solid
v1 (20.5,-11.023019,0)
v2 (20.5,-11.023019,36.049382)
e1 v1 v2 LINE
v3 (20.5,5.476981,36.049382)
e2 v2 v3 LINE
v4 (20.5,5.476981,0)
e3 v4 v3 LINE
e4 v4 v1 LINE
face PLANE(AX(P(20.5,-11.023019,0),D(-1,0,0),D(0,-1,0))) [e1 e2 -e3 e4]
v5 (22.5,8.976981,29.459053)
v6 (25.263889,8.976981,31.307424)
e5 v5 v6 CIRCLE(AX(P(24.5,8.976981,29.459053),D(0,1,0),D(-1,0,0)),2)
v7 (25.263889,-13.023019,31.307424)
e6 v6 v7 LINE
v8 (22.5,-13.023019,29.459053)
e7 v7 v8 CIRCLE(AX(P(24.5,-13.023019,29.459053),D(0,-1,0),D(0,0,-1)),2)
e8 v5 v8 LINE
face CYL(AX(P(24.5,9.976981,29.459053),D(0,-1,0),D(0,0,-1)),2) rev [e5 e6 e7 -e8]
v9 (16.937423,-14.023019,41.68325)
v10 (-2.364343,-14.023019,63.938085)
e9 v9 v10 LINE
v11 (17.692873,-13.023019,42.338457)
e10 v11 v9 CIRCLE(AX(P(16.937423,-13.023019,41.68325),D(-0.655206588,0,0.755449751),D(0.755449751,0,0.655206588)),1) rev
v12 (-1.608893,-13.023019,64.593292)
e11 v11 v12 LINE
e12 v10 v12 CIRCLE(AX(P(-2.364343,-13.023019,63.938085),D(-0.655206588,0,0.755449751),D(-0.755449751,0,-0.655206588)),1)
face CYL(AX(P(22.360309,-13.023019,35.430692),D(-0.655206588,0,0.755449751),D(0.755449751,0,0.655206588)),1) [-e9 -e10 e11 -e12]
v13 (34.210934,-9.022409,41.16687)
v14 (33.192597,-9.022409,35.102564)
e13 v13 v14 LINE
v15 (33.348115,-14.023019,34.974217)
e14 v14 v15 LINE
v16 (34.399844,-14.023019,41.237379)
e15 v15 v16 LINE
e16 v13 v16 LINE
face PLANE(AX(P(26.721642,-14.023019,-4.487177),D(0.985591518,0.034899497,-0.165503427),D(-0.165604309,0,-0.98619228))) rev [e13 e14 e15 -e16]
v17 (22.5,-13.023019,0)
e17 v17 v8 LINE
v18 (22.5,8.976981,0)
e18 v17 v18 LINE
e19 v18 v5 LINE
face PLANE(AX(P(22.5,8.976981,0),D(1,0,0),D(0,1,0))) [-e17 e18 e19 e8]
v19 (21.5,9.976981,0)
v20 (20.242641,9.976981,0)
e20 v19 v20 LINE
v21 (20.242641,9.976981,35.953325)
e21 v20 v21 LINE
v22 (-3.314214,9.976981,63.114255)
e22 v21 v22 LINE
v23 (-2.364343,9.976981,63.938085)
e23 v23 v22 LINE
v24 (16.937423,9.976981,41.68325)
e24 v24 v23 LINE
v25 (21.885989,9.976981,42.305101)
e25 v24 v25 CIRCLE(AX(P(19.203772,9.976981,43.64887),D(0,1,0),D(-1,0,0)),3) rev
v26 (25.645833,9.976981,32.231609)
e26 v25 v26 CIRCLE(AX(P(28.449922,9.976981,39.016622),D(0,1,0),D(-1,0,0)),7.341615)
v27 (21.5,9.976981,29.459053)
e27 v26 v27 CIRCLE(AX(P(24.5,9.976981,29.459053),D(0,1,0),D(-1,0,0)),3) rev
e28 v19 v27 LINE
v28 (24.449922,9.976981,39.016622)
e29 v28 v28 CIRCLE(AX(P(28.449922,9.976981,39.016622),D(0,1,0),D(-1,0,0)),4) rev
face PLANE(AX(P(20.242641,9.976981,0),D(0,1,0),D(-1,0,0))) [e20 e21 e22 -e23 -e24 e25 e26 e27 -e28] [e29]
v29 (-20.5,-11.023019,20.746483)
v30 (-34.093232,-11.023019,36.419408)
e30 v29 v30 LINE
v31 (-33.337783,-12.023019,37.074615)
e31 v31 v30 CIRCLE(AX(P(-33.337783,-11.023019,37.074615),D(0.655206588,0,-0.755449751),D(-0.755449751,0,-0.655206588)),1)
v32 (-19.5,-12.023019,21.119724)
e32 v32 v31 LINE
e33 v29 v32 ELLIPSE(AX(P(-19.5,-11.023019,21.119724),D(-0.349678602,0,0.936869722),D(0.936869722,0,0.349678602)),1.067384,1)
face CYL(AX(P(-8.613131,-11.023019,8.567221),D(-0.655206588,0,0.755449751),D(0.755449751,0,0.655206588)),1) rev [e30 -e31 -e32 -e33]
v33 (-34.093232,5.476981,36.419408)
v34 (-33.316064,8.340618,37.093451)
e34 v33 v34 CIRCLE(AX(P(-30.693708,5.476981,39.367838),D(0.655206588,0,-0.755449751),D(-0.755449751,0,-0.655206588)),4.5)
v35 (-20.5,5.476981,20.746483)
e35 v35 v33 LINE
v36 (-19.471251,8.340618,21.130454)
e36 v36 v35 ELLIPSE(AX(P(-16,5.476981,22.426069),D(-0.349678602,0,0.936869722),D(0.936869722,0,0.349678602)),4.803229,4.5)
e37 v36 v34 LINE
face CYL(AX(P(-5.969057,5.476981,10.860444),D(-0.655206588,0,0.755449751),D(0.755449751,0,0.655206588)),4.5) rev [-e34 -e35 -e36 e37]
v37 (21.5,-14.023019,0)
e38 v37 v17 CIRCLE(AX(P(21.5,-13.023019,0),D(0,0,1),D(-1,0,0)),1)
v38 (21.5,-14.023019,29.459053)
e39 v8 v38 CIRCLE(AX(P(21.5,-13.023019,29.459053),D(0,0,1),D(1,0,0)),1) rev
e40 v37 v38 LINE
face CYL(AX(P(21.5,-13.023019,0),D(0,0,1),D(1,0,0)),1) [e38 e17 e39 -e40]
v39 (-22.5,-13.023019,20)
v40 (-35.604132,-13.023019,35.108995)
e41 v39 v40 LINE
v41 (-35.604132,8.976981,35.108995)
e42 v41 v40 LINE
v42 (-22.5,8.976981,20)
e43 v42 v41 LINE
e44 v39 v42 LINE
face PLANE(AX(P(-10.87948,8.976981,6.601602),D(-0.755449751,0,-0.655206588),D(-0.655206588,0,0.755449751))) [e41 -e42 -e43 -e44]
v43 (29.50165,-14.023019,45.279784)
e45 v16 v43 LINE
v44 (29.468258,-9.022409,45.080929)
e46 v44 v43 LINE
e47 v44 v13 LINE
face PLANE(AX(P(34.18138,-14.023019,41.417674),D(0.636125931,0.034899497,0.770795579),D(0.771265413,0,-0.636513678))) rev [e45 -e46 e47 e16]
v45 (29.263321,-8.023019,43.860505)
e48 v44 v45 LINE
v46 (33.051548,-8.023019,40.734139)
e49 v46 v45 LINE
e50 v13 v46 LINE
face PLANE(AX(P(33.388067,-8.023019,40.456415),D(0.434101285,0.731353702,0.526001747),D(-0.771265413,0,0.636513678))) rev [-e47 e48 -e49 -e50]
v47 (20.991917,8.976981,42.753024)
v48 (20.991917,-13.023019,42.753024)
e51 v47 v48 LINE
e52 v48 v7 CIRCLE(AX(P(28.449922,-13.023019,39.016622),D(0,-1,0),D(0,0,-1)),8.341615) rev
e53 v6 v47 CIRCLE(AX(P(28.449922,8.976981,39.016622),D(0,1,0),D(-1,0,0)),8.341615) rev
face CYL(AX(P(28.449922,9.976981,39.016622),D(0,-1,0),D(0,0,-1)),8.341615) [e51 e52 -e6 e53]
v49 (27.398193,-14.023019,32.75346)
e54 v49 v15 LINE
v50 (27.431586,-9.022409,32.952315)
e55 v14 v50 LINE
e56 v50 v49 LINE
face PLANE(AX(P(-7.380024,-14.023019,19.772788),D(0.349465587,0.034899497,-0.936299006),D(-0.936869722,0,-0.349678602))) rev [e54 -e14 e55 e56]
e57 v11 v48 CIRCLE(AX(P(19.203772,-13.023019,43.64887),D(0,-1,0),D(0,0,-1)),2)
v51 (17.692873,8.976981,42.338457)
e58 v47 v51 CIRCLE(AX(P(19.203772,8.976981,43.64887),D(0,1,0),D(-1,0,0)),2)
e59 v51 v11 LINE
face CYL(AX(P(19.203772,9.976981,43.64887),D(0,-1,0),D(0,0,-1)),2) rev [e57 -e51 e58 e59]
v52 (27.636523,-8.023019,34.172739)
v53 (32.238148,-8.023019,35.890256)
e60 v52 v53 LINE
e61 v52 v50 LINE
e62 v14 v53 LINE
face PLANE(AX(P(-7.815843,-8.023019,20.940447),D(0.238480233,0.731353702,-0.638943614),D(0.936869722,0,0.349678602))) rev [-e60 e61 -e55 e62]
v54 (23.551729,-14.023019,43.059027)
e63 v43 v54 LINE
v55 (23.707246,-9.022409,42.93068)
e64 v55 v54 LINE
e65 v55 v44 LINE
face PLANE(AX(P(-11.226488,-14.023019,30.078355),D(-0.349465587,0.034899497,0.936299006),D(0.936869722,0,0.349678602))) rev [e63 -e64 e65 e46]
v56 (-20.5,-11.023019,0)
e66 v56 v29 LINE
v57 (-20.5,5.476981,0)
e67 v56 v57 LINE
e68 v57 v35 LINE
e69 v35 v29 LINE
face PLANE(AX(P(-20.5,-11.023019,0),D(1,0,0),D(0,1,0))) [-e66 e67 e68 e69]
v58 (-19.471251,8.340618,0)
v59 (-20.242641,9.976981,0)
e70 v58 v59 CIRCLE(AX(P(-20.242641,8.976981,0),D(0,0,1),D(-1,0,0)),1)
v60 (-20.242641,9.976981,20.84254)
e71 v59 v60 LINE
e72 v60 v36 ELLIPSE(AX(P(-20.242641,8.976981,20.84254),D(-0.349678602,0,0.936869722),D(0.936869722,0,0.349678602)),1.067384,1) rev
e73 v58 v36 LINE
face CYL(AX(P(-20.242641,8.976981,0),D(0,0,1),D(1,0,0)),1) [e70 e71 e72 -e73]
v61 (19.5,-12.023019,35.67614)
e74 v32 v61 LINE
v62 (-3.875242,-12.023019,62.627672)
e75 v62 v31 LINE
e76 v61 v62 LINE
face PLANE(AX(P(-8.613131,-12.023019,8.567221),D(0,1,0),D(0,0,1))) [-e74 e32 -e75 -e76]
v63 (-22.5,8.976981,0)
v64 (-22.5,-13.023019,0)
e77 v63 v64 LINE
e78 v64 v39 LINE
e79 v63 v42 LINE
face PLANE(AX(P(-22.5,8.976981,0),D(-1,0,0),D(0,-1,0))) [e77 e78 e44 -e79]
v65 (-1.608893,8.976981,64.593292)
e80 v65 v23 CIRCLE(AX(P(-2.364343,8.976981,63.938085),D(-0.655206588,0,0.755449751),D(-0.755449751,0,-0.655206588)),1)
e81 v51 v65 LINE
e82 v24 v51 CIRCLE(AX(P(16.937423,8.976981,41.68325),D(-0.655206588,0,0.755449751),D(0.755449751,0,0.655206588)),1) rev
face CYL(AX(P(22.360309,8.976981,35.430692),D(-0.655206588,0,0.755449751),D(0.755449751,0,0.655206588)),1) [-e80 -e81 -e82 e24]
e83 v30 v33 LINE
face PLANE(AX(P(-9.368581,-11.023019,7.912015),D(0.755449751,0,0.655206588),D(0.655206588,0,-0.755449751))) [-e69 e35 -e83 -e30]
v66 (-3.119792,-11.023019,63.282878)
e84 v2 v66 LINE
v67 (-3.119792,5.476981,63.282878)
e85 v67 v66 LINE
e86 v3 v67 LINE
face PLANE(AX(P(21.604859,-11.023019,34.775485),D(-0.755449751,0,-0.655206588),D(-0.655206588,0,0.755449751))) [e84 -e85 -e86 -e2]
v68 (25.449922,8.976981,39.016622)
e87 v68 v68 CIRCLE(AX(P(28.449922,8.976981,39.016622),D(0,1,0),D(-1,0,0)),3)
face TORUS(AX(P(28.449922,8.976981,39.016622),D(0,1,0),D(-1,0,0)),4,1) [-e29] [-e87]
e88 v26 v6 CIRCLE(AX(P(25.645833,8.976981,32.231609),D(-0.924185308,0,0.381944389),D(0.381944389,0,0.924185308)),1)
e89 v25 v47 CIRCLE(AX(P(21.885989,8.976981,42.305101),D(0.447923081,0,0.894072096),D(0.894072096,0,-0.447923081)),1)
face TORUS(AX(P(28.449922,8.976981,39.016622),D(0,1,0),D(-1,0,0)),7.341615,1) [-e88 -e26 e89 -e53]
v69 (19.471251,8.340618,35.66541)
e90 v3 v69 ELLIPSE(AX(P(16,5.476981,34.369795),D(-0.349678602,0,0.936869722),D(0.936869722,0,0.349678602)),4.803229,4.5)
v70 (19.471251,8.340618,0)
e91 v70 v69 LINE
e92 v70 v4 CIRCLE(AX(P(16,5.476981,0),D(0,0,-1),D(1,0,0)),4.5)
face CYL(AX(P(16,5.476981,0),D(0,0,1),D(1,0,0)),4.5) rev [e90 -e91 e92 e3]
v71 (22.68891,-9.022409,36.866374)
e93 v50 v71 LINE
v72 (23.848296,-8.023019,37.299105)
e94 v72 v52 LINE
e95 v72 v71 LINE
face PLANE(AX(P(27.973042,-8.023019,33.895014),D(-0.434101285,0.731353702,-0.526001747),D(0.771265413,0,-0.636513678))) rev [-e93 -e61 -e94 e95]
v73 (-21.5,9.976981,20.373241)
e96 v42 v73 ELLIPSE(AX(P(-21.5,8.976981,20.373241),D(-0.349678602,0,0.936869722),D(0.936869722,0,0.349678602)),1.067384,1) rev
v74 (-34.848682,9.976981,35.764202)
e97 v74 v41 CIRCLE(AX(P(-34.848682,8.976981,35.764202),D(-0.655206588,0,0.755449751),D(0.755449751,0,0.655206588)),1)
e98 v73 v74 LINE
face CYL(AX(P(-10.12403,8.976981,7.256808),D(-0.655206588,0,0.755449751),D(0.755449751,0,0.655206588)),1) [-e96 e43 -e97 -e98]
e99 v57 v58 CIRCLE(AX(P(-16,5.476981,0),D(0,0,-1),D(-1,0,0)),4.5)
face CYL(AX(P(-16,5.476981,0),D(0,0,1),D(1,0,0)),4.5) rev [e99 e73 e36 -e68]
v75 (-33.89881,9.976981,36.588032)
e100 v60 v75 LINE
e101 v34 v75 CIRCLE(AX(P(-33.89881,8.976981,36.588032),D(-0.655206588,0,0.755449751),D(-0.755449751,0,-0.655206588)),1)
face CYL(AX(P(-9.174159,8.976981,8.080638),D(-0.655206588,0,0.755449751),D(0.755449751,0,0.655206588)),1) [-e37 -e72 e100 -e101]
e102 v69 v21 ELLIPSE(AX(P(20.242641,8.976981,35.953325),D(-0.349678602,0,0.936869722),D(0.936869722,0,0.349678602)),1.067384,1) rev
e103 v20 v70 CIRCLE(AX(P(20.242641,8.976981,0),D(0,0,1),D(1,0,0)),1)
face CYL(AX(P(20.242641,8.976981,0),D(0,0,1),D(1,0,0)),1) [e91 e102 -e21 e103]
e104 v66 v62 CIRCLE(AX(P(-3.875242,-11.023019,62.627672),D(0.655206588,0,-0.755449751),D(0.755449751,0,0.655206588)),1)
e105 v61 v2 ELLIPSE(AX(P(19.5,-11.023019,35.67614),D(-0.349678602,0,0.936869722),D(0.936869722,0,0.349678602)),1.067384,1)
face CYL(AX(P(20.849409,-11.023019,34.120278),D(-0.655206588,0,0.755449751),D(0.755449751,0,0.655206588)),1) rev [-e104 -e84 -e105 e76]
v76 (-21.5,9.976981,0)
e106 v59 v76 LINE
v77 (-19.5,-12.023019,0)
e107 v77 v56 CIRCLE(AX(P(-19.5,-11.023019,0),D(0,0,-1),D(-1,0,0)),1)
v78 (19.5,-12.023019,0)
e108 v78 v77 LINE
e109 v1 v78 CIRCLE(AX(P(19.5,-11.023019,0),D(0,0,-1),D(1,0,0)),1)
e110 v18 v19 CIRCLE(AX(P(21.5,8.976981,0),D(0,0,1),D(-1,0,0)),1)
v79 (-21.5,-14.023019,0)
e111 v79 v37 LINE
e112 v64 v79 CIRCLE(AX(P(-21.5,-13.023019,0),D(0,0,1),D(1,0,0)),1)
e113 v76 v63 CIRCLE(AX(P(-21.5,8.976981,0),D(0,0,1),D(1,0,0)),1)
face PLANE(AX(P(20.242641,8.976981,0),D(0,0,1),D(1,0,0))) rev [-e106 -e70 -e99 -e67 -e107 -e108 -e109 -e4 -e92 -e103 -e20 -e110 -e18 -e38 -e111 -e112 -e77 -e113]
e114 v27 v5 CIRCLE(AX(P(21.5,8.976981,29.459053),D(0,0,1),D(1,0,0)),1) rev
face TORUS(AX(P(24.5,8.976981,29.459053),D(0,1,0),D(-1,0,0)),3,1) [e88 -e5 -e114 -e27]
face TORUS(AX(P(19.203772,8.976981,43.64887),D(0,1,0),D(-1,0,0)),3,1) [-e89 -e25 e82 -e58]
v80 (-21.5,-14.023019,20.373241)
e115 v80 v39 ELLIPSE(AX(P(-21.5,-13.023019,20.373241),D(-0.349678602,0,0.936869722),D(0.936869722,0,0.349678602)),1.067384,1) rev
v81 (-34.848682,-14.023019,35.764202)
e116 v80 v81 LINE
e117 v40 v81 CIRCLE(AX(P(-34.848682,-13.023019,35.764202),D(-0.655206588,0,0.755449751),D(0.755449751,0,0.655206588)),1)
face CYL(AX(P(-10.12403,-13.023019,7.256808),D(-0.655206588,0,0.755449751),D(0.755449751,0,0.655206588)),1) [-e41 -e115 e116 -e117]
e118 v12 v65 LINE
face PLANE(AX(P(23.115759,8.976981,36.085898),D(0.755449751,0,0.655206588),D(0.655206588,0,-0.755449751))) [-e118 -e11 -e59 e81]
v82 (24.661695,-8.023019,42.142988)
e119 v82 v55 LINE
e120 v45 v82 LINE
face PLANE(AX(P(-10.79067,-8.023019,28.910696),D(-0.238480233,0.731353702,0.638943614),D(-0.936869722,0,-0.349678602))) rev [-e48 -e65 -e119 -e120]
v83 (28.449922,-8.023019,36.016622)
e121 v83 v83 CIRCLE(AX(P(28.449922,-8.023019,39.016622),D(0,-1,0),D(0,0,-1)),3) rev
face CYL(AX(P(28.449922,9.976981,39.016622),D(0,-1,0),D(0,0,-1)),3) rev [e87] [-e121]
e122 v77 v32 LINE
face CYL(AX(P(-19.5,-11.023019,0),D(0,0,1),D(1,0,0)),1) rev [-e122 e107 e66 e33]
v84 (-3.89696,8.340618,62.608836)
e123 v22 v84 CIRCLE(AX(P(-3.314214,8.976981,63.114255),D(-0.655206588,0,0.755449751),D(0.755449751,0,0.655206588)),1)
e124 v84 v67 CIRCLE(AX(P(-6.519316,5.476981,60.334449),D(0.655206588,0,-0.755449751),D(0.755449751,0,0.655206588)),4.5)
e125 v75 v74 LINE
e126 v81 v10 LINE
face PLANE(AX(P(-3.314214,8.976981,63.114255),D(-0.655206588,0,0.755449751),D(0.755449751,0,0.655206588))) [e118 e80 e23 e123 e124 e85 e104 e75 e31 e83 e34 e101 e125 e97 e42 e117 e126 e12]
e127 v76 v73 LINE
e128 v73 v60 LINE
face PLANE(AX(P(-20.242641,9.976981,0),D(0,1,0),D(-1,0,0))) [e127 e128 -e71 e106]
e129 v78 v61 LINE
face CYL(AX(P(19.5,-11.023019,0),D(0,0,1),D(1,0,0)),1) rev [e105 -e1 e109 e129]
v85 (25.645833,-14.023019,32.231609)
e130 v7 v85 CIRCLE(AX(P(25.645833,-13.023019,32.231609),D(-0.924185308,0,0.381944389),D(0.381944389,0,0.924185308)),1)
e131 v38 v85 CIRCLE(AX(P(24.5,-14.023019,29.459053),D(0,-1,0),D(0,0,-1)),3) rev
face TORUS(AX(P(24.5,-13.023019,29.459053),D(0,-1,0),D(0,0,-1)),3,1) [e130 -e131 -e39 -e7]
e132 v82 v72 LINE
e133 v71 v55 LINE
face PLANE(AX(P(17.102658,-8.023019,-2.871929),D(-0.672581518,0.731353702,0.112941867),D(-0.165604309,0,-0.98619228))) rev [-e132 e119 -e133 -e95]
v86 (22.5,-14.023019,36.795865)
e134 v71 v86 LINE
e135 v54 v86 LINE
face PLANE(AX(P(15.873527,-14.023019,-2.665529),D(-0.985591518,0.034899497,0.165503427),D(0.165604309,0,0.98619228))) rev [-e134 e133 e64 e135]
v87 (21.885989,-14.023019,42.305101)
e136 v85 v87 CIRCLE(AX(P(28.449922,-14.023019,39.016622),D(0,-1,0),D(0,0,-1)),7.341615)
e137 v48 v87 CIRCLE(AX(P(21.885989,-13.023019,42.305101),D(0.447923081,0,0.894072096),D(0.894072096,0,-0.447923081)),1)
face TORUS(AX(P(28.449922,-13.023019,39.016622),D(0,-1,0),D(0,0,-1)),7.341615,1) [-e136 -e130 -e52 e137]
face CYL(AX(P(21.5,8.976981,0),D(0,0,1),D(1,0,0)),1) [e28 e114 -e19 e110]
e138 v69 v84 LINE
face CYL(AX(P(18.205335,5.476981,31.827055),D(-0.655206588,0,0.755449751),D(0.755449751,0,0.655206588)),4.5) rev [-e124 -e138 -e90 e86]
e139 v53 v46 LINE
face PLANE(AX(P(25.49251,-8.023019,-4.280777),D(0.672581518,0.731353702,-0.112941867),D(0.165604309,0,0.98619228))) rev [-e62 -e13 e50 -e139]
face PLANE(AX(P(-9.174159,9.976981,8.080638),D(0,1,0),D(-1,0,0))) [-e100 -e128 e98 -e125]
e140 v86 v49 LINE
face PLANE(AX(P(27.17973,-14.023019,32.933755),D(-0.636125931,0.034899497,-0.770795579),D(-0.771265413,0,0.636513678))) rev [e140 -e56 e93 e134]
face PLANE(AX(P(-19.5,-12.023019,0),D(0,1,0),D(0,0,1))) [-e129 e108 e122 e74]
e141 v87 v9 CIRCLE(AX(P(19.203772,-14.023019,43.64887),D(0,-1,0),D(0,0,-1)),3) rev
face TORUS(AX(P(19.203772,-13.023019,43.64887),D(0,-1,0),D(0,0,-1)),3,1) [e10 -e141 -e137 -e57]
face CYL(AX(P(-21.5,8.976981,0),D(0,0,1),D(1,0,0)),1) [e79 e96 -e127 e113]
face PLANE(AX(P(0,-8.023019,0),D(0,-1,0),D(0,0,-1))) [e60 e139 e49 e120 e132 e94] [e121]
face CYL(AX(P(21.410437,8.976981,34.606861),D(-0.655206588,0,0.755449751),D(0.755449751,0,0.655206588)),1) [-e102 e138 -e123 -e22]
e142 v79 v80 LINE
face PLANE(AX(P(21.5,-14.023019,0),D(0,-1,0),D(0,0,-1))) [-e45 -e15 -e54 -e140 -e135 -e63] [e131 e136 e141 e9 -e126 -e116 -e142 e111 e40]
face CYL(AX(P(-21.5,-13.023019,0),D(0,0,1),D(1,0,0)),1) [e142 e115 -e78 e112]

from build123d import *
from OCP.BRepFilletAPI import BRepFilletAPI_MakeChamfer

# Parameters (mm, degrees)
SKETCH4_R           = 2.9999999999999982
BOSS_EXTRUDE2_DEPTH = 24
CUT_EXTRUDE2_DEPTH  = 6
CUT_EXTRUDE2_DRAFT  = -2.0000000000000044
CHAMFER1_SIZE       = 1
CHAMFER1_SIZE2      = 1.0368159552784713
FILLET8_R           = 1


with BuildPart() as part:
    # Sweep1: sweep along a path in Sketch3
    with BuildLine(Plane(origin=(0, 0, 0), x_dir=(1, 0, 0), z_dir=(0, 1, 0))) as sweep1_path:
        Line((0, 0), (3.43e-15, -28.397932341701697))
        Line((3.43e-15, -28.397932341701697), (-18.606512367640427, -49.85114326213761))
    # Sketch1 → Sweep1 (sweep)
    with BuildSketch(Plane.XY):
        with BuildLine():
            Line((-19.500000000000004, -12.023018516113881), (19.500000000000004, -12.023018516113881))
            ThreePointArc((19.500000000000004, -12.023018516113881), (20.207106781186553, -11.730125297300427), (20.499999999999996, -11.02301851611388))
            Line((20.499999999999996, -11.02301851611388), (20.5, 5.476981483886118))
            ThreePointArc((20.5, 5.476981483886118), (20.235010721400677, 6.998390104086923), (19.471251471279412, 8.34061784752248))
            ThreePointArc((19.471251471279412, 8.34061784752248), (19.338106653385996, 9.403382916597337), (20.242640687119284, 9.976981483886115))
            Line((20.242640687119284, 9.976981483886115), (21.5, 9.976981483886117))
            ThreePointArc((21.5, 9.976981483886117), (22.207106781186546, 9.684088265072665), (22.5, 8.976981483886117))
            Line((22.5, 8.976981483886117), (22.500000000000004, -13.023018516113874))
            ThreePointArc((22.500000000000004, -13.023018516113874), (22.20710678118655, -13.730125297300424), (21.5, -14.023018516113883))
            Line((21.5, -14.023018516113883), (-21.5, -14.023018516113883))
            ThreePointArc((-21.5, -14.023018516113883), (-22.20710678118655, -13.730125297300424), (-22.500000000000004, -13.023018516113874))
            Line((-22.500000000000004, -13.023018516113874), (-22.5, 8.976981483886117))
            ThreePointArc((-22.5, 8.976981483886117), (-22.207106781186546, 9.684088265072665), (-21.5, 9.976981483886117))
            Line((-21.5, 9.976981483886117), (-20.242640687119284, 9.976981483886115))
            ThreePointArc((-20.242640687119284, 9.976981483886115), (-19.338106653385996, 9.403382916597337), (-19.471251471279412, 8.34061784752248))
            ThreePointArc((-19.471251471279412, 8.34061784752248), (-20.235010721400677, 6.998390104086923), (-20.5, 5.476981483886118))
            Line((-20.5, 5.476981483886118), (-20.499999999999996, -11.02301851611388))
            ThreePointArc((-20.499999999999996, -11.02301851611388), (-20.207106781186553, -11.730125297300429), (-19.500000000000004, -12.023018516113881))
        make_face()
    sweep(path=sweep1_path.line, transition=Transition.RIGHT)

    # Sketch4 → Boss-Extrude2 (add, through all)
    with BuildSketch(Plane(origin=(0, -14.023018516113883, 0), x_dir=(-1, 0, 0), z_dir=(0, -1, 0))):
        with BuildLine():
            Line((-21.5, -34.67531871716202), (-21.5, -29.459053367546638))
            Line((-21.5, -29.459053367546638), (-22.500000000000004, -29.459053367546638))
            ThreePointArc((-22.500000000000004, -29.459053367546638), (-23.388194611615152, -31.12154811290928), (-25.26388877835841, -31.307423983602327))
            ThreePointArc((-25.263888778358414, -31.307423983602334), (-36.264928425658965, -41.93350635482782), (-20.991916583156645, -42.753023981442176))
            ThreePointArc((-20.991916583156645, -42.75302398144217), (-19.45313679656983, -41.66447668579883), (-17.692872887894488, -42.33845696613024))
            Line((-17.692872887894488, -42.33845696613024), (-16.93742313675424, -41.68325037771543))
            Line((-16.93742313675424, -41.68325037771543), (-21.5, -36.42262324599441))
            Line((-21.5, -36.42262324599441), (-21.5, -34.67531871716202))
        make_face()
        with Locations(Location((-28.449921846657176, -39.01662206592069, 0), (0, 0, 90))):
            Circle(SKETCH4_R, mode=Mode.SUBTRACT)
    extrude(amount=-BOSS_EXTRUDE2_DEPTH)


with BuildPart() as cut_extrude2_tool:
    # Sketch5 → Cut-Extrude2 (with draft: the straight prism first)
    with BuildSketch(Plane(origin=(0, -14.023018516113883, 0), x_dir=(-1, 0, 0), z_dir=(0, -1, 0))):
        Polygon((-29.501650461083923, -45.27978422691646), (-23.551728614426768, -43.05902684439915), (-22.500000000000025, -36.79586468340338), (-27.39819323223043, -32.75345990492492), (-33.348115078887595, -34.974217287442244), (-34.39984369331434, -41.237379448438006), align=None)
    extrude(amount=-CUT_EXTRUDE2_DEPTH)
    # Cut-Extrude2: the draft: its side faces are tilted about the plane it starts from
    cut_extrude2_sides = [cut_extrude2_tool.faces().sort_by_distance(p)[0] for p in [
        (26.526689538, -11.023018516, 44.169405536),
        (23.025864307, -11.023018516, 39.927445764),
        (24.949096616, -11.023018516, 34.774662294),
        (30.373154156, -11.023018516, 33.863838596),
        (33.873979386, -11.023018516, 38.105798368),
        (31.950747077, -11.023018516, 43.258581838),
    ]]
    draft(cut_extrude2_sides, Plane(origin=(0, -14.023018516113883, 0), x_dir=(-1, 0, 0), z_dir=(0, -1, 0)), CUT_EXTRUDE2_DRAFT)


with BuildPart() as part_1:
    add(part.part)

    # Cut-Extrude2: cut by cut_extrude2_tool
    add(cut_extrude2_tool.part, mode=Mode.SUBTRACT)

    # Chamfer1: one chamfer whose edges measure the first distance from different faces: ONE call of the kernel's chamfer builder (chamfer() names one face for all edges)
    chamfer1_edges_1 = [part_1.edges().sort_by_distance(p)[0] for p in [
        (33.667347826415636, -8.023018516113883, 38.14049654729082),
    ]]
    chamfer1_side_1 = [part_1.faces().sort_by_distance(p)[0] for p in [
        (33.77133231943445, -11.042436068122724, 38.123035165331785),
    ]]
    chamfer1_edges_2 = [part_1.edges().sort_by_distance(p)[0] for p in [
        (30.299887880499114, -8.023018516113883, 34.060135865770036),
    ]]
    chamfer1_side_2 = [part_1.faces().sort_by_distance(p)[0] for p in [
        (30.336758126646806, -11.042436068122724, 33.96135196223658),
    ]]
    chamfer1_edges_3 = [part_1.edges().sort_by_distance(p)[0] for p in [
        (25.08246190074066, -8.023018516113883, 34.936261384399906),
    ]]
    chamfer1_side_3 = [part_1.faces().sort_by_distance(p)[0] for p in [
        (25.015347653869544, -11.042436068122724, 34.854938862825485),
    ]]
    chamfer1_edges_4 = [part_1.edges().sort_by_distance(p)[0] for p in [
        (23.232495866898734, -8.023018516113883, 39.89274758455057),
    ]]
    chamfer1_side_4 = [part_1.faces().sort_by_distance(p)[0] for p in [
        (23.12851137387992, -11.042436068122724, 39.91020896650961),
    ]]
    chamfer1_edges_5 = [part_1.edges().sort_by_distance(p)[0] for p in [
        (26.599955812815256, -8.023018516113883, 43.97310826607136),
    ]]
    chamfer1_side_5 = [part_1.faces().sort_by_distance(p)[0] for p in [
        (26.56308556666756, -11.042436068122724, 44.07189216960481),
    ]]
    chamfer1_edges_6 = [part_1.edges().sort_by_distance(p)[0] for p in [
        (31.81738179257371, -8.023018516113883, 43.09698274744148),
    ]]
    chamfer1_side_6 = [part_1.faces().sort_by_distance(p)[0] for p in [
        (31.88449603944482, -11.042436068122724, 43.178305269015894),
    ]]
    chamfer1 = BRepFilletAPI_MakeChamfer(part_1.part.solid().wrapped)
    for e in chamfer1_edges_1:
        chamfer1.Add(CHAMFER1_SIZE, CHAMFER1_SIZE2, e.wrapped, chamfer1_side_1[0].wrapped)  # the first distance lies on this face
    for e in chamfer1_edges_2:
        chamfer1.Add(CHAMFER1_SIZE, CHAMFER1_SIZE2, e.wrapped, chamfer1_side_2[0].wrapped)  # the first distance lies on this face
    for e in chamfer1_edges_3:
        chamfer1.Add(CHAMFER1_SIZE, CHAMFER1_SIZE2, e.wrapped, chamfer1_side_3[0].wrapped)  # the first distance lies on this face
    for e in chamfer1_edges_4:
        chamfer1.Add(CHAMFER1_SIZE, CHAMFER1_SIZE2, e.wrapped, chamfer1_side_4[0].wrapped)  # the first distance lies on this face
    for e in chamfer1_edges_5:
        chamfer1.Add(CHAMFER1_SIZE, CHAMFER1_SIZE2, e.wrapped, chamfer1_side_5[0].wrapped)  # the first distance lies on this face
    for e in chamfer1_edges_6:
        chamfer1.Add(CHAMFER1_SIZE, CHAMFER1_SIZE2, e.wrapped, chamfer1_side_6[0].wrapped)  # the first distance lies on this face
    add(Compound.cast(chamfer1.Shape()), mode=Mode.REPLACE)

    # Fillet8
    # the kernel refuses this fillet: 1 mm, written as the material it takes off along each edge
    with BuildSketch(Plane(origin=(24.500000000000004, -14.023018516113883, 29.459053367546634), x_dir=(-0.31457819430358575, 0, -0.9492315627225506), z_dir=(0.9492315627225506, 0, -0.31457819430358575))) as fillet8_piece_1:
        with BuildLine():
            CenterArc((2 + FILLET8_R, FILLET8_R), FILLET8_R, 180, 90)
            Line((2, FILLET8_R), (2, 0))
            Line((2, 0), (2 + FILLET8_R, 0))
        make_face()
    revolve(axis=Axis((24.500000000000004, -14.023018516113883, 29.459053367546634), (0, 1, 0)), revolution_arc=184.1188230563678, mode=Mode.SUBTRACT)
    with BuildSketch(Plane(origin=(24.500000000000004, 9.976981483886117, 29.459053367546634), x_dir=(-0.31457819430358197, 0, -0.9492315627225518), z_dir=(0.9492315627225518, 0, -0.31457819430358197))) as fillet8_piece_2:
        with BuildLine():
            CenterArc((2.000000000000001 + FILLET8_R, -FILLET8_R), FILLET8_R, 90, 90)
            Line((2.000000000000001 + FILLET8_R, 3.55e-15), (2.000000000000001, 3.55e-15))
            Line((2.000000000000001, 3.55e-15), (2.000000000000001, -FILLET8_R))
        make_face()
    revolve(axis=Axis((24.500000000000004, 9.976981483886117, 29.459053367546634), (0, 1, 0)), revolution_arc=184.11882305636792, mode=Mode.SUBTRACT)
    with BuildSketch(Plane(origin=(19.20377239017497, -14.023018516113883, 43.64887014295982), x_dir=(0.8940720964908377, 0, -0.4479230807588265), z_dir=(0.4479230807588265, 0, 0.8940720964908377))) as fillet8_piece_3:
        with BuildLine():
            CenterArc((2.0000000000000004 + FILLET8_R, FILLET8_R), FILLET8_R, 180, 90)
            Line((2.000000000000001, FILLET8_R), (2.0000000000000004, 0))
            Line((2.0000000000000004, 0), (2.0000000000000004 + FILLET8_R, 0))
        make_face()
    revolve(axis=Axis((19.20377239017497, -14.023018516113883, 43.64887014295982), (0, 1, 0)), revolution_arc=184.1188230563678, mode=Mode.SUBTRACT)
    with BuildSketch(Plane(origin=(19.20377239017497, 9.976981483886117, 43.64887014295982), x_dir=(0.8940720964908377, 0, -0.4479230807588265), z_dir=(0.4479230807588265, 0, 0.8940720964908377))) as fillet8_piece_4:
        with BuildLine():
            CenterArc((2.0000000000000004 + FILLET8_R, -FILLET8_R), FILLET8_R, 90.00000000000018, 89.99999999999983)
            Line((2.0000000000000004 + FILLET8_R, 0), (2.0000000000000004, 0))
            Line((2.0000000000000004, 0), (2.000000000000001, -FILLET8_R))
        make_face()
    revolve(axis=Axis((19.20377239017497, 9.976981483886117, 43.64887014295982), (0, 1, 0)), revolution_arc=184.1188230563678, mode=Mode.SUBTRACT)
    with BuildSketch(Plane(origin=(28.449921846657183, -14.023018516113883, 39.0166220659207), x_dir=(-0.3819443891792063, 0, -0.9241853080278452), z_dir=(-0.9241853080278452, 0, 0.3819443891792063))) as fillet8_piece_5:
        with BuildLine():
            CenterArc((8.341615058531193 - FILLET8_R, -FILLET8_R), FILLET8_R, 0, 90)
            Line((8.34161505853119, -FILLET8_R), (8.341615058531193, 0))
            Line((8.341615058531193, 0), (8.341615058531193 - FILLET8_R, 0))
        make_face()
    revolve(axis=Axis((28.449921846657183, -14.023018516113883, 39.0166220659207), (0, -1, 0)), revolution_arc=265.84366585936306, mode=Mode.SUBTRACT)
    with BuildSketch(Plane(origin=(28.449921846657183, 9.976981483886117, 39.0166220659207), x_dir=(-0.3819443891792063, 0, -0.9241853080278452), z_dir=(-0.9241853080278452, 0, 0.3819443891792063))) as fillet8_piece_6:
        with BuildLine():
            CenterArc((8.341615058531193 - FILLET8_R, FILLET8_R), FILLET8_R, 270.00000000000034, 89.99999999999966)
            Line((8.341615058531193 - FILLET8_R, 0), (8.341615058531193, 0))
            Line((8.341615058531193, 0), (8.34161505853119, FILLET8_R))
        make_face()
    revolve(axis=Axis((28.449921846657183, 9.976981483886117, 39.0166220659207), (0, -1, 0)), revolution_arc=265.84366585936306, mode=Mode.SUBTRACT)
    with BuildSketch(Plane(origin=(28.449921846657176, 9.976981483886117, 39.01662206592069), x_dir=(0, 0, -1), z_dir=(-1, 0, 0))) as fillet8_piece_7:
        with BuildLine():
            CenterArc((3 + FILLET8_R, FILLET8_R), FILLET8_R, 180, 90)
            Line((3 + FILLET8_R, 0), (3, 0))
            Line((3, 0), (3, FILLET8_R))
        make_face()
    revolve(axis=Axis((28.449921846657176, 9.976981483886117, 39.01662206592069), (0, -1, 0)), mode=Mode.SUBTRACT)


solid = part_1.part
